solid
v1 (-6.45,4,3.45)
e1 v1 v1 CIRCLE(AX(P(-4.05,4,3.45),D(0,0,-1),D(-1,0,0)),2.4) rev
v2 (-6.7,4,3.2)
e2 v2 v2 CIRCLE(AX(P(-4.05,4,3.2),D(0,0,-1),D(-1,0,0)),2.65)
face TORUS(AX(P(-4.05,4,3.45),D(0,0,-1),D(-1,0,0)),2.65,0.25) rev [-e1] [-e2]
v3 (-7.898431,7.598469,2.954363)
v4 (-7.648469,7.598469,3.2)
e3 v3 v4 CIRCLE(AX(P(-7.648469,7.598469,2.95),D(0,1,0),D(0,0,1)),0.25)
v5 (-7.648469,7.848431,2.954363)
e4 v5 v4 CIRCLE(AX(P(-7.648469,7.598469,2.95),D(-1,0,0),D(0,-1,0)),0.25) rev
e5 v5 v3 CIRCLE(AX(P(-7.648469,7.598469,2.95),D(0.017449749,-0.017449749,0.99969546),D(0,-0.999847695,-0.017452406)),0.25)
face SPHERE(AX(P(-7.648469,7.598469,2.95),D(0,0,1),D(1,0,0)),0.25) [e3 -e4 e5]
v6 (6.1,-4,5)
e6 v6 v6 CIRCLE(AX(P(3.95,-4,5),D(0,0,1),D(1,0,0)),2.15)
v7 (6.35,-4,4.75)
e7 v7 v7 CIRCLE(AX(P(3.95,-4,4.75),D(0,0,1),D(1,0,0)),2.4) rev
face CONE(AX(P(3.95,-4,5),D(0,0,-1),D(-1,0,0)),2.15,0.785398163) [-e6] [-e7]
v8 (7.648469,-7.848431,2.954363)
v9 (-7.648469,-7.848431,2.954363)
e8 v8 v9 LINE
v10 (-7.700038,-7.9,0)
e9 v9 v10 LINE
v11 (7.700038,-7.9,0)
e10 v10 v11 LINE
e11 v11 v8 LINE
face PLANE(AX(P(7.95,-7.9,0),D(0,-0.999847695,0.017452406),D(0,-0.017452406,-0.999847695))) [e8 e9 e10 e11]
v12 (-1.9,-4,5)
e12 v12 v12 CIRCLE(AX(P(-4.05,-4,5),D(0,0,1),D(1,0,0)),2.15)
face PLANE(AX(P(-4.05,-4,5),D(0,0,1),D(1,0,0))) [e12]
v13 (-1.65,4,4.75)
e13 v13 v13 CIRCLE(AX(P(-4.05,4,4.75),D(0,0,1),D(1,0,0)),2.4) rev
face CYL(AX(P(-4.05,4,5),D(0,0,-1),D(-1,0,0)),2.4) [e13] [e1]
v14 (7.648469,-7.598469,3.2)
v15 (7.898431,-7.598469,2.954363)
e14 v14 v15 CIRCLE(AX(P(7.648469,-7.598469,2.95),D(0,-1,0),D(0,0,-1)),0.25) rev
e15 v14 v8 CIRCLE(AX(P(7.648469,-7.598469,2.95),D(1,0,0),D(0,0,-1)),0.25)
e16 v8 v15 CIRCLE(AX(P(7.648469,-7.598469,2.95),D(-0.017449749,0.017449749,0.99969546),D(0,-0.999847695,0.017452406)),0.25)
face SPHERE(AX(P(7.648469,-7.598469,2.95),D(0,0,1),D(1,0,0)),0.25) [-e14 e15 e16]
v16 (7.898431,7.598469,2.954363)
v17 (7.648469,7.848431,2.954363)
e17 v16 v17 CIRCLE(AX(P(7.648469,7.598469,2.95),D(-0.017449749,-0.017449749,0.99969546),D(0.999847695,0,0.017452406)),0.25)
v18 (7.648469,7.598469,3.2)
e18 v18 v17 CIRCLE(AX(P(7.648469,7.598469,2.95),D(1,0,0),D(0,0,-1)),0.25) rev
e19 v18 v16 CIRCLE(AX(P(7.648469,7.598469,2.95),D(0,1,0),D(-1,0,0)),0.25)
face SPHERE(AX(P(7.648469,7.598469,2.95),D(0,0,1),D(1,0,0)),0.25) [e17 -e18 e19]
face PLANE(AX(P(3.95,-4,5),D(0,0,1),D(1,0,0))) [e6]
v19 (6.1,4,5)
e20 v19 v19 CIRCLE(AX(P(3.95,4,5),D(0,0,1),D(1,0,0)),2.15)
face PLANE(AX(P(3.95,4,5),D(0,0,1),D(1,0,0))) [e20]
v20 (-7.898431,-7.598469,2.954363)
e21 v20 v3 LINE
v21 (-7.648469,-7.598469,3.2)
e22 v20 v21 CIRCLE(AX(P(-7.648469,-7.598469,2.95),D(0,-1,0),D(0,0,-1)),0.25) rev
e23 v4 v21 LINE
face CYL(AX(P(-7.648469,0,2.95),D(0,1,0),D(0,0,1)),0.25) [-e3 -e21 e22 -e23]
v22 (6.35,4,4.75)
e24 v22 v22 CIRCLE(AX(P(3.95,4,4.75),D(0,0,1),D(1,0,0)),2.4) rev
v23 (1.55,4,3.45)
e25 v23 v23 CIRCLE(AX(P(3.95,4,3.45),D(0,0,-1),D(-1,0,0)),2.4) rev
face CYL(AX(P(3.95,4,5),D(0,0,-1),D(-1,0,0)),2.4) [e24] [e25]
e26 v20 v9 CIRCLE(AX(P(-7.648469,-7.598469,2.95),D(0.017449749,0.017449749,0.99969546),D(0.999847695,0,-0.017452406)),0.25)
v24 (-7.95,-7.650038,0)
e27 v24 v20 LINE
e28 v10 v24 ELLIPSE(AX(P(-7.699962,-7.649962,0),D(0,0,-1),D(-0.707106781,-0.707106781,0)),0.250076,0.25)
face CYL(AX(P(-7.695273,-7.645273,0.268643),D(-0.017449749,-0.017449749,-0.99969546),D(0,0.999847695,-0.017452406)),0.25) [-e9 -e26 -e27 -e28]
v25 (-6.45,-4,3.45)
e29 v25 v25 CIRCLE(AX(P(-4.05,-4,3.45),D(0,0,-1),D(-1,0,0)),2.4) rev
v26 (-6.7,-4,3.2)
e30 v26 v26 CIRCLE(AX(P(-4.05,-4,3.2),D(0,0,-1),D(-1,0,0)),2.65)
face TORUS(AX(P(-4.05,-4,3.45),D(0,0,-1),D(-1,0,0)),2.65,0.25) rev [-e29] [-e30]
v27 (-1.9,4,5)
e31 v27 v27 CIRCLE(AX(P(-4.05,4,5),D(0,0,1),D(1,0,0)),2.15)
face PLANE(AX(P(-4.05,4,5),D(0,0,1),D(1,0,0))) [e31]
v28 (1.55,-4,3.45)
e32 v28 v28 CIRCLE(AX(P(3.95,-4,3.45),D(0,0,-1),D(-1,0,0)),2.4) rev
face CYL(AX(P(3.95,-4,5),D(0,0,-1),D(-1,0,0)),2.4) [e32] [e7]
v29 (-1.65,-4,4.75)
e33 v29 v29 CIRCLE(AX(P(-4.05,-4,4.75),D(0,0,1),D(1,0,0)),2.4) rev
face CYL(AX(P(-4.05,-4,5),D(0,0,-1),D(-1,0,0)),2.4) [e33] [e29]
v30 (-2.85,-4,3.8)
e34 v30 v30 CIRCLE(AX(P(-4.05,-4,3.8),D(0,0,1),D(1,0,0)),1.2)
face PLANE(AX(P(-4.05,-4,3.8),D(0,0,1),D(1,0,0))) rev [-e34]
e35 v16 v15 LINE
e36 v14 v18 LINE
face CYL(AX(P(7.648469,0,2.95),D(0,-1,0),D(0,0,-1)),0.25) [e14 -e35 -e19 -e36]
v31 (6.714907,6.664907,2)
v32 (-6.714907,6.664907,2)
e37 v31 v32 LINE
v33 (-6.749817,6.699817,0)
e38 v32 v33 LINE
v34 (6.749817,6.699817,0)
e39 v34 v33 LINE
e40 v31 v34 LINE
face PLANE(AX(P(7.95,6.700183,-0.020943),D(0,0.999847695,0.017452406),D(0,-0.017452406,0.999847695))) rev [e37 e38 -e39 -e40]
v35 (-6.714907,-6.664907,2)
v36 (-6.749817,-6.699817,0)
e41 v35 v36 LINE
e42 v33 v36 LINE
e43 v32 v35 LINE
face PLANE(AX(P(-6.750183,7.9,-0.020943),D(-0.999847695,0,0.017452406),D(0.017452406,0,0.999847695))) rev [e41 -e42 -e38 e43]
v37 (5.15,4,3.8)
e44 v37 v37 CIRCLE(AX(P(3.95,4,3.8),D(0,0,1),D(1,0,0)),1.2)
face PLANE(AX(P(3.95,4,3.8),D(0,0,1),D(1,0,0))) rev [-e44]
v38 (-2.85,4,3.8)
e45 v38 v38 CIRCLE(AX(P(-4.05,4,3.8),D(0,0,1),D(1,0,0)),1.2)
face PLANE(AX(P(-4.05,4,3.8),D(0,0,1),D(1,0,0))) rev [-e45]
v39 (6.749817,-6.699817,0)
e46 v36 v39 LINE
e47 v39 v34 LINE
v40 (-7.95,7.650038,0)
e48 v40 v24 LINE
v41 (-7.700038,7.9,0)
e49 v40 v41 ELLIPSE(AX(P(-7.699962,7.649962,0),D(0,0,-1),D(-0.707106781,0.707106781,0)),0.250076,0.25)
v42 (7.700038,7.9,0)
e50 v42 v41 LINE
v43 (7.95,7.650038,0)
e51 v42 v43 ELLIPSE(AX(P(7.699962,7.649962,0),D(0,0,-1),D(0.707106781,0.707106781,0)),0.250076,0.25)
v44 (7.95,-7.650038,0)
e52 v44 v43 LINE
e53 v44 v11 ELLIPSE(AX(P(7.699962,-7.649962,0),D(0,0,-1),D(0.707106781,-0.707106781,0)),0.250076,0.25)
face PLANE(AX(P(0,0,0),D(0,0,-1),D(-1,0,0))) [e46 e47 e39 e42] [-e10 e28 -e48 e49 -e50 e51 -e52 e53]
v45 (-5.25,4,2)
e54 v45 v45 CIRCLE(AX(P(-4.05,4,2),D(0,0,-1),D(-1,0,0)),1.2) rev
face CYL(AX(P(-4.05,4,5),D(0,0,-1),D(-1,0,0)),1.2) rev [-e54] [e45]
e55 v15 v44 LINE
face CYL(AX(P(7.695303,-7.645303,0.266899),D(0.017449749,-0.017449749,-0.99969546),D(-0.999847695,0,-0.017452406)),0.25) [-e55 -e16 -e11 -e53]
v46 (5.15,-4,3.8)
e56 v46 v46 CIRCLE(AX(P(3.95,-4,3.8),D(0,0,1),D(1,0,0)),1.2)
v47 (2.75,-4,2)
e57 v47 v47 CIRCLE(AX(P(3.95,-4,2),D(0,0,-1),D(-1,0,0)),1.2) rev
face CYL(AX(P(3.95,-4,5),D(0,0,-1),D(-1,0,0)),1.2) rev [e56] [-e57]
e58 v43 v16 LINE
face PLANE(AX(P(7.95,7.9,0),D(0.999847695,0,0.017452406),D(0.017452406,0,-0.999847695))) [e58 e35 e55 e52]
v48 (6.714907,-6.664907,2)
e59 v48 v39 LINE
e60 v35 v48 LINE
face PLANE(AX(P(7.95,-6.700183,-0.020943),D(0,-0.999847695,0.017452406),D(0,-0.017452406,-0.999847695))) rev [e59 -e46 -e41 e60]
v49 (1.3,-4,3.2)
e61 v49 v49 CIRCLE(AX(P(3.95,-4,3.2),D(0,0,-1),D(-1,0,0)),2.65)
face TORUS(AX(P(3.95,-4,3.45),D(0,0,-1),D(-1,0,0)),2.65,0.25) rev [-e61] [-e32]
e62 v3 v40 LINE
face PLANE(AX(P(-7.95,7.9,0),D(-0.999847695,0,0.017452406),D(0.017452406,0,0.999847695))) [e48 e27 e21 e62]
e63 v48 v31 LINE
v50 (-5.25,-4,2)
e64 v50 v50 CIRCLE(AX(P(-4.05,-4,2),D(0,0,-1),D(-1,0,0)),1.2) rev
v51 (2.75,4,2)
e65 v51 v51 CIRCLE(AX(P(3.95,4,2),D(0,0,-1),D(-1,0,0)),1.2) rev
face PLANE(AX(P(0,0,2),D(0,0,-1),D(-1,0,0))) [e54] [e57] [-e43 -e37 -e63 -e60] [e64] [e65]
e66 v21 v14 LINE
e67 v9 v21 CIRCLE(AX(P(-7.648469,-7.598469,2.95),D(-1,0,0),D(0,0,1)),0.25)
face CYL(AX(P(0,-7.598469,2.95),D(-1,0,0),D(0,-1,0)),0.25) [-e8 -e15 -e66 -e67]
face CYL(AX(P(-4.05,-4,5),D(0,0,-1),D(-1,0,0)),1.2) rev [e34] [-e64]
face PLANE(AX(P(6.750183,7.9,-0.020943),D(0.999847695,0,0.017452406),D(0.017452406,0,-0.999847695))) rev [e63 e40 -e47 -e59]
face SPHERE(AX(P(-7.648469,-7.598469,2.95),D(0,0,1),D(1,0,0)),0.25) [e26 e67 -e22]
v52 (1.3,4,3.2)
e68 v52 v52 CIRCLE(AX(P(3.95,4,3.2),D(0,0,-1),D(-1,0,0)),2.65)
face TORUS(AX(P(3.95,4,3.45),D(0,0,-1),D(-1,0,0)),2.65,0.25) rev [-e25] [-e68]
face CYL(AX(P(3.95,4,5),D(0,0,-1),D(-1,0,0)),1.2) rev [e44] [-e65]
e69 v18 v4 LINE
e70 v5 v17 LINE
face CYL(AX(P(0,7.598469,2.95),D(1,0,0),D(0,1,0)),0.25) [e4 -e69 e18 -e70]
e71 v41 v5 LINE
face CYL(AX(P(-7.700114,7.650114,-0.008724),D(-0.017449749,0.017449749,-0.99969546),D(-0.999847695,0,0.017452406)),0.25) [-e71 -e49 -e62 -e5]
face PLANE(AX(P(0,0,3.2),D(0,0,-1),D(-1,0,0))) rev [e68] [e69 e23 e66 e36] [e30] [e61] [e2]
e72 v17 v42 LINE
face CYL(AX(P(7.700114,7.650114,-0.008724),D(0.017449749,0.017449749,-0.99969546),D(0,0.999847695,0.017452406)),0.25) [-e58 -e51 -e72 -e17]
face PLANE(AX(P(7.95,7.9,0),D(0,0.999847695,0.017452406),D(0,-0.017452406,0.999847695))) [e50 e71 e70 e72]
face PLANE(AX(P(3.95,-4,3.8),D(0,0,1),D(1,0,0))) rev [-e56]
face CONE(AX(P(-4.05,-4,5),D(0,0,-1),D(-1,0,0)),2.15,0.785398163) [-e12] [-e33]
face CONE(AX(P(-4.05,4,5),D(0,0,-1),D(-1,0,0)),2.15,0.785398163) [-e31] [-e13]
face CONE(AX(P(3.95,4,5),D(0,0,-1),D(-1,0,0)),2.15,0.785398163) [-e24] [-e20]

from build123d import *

# Parameters (mm, degrees)
SKETCH1_W                  = 15.9
SKETCH1_H                  = 15.8
BOSS_EXTRUDE1_DEPTH        = 3.2
BOSS_EXTRUDE1_TAPER        = 1
SKETCH2_R                  = 2.4
BOSS_EXTRUDE2_DEPTH        = 1.8
CHAMFER3_SIZE              = 0.25
LPATTERN2_COUNT            = 2
LPATTERN2_PITCH            = 8
LPATTERN2_COUNT_DIR2       = 2
LPATTERN2_PITCH_DIR2       = 8
CHAMFER3_OF_LPATTERN2_SIZE = 0.25
SHELL1_OUTLINE_R           = 1.2
SHELL1_DEPTH               = 3.8
FILLET2_R                  = 0.25


with BuildPart() as part:
    # Sketch1 → Boss-Extrude1 (new body)
    with BuildSketch(Plane.XY):
        Rectangle(SKETCH1_W, SKETCH1_H)
    extrude(amount=BOSS_EXTRUDE1_DEPTH, taper=BOSS_EXTRUDE1_TAPER)

    # Sketch2 → Boss-Extrude2 (add)
    with BuildSketch(Plane.XY.offset(3.2)):
        with Locations(Location((-4.05, -4, 0), (0, 0, 180))):
            Circle(SKETCH2_R)
    boss_extrude2 = extrude(amount=BOSS_EXTRUDE2_DEPTH)

    # Chamfer3
    chamfer3_edges = [part.edges().sort_by_distance(p)[0] for p in [
        (-1.65, -4, 5),
    ]]
    chamfer(chamfer3_edges, length=CHAMFER3_SIZE)

    # LPattern2: Boss-Extrude2 2 × 2
    with Locations(*[(j * LPATTERN2_PITCH_DIR2, i * LPATTERN2_PITCH, 0) for i in range(LPATTERN2_COUNT) for j in range(LPATTERN2_COUNT_DIR2) if (i, j) != (0, 0)]):
        add(boss_extrude2)

    # Chamfer3 of LPattern2
    chamfer3_of_lpattern2_edges = [part.edges().sort_by_distance(p)[0] for p in [
        (6.35, -4, 5),
        (-1.65, 4, 5),
        (6.35, 4, 5),
    ]]
    chamfer(chamfer3_of_lpattern2_edges, length=CHAMFER3_OF_LPATTERN2_SIZE)

    # Shell1: read off the stored shape, not the designer's step
    # Shell1 outline → Shell1 (cut)
    with BuildSketch(Plane.XY):
        with Locations((3.95, 4)):
            Circle(SHELL1_OUTLINE_R)
        with Locations((3.95, -4)):
            Circle(SHELL1_OUTLINE_R)
        with Locations((-4.05, -4)):
            Circle(SHELL1_OUTLINE_R)
        with Locations((-4.05, 4)):
            Circle(SHELL1_OUTLINE_R)
    extrude(amount=SHELL1_DEPTH, mode=Mode.SUBTRACT)

    # Shell1 2: loft between two sections, ruled curve by curve
    shell1_2_from = [
        Edge.make_line((-6.714907076, 6.664907076, 2), (-6.714907076, -6.664907076, 2)),
        Edge.make_line((-6.714907076, -6.664907076, 2), (6.714907076, -6.664907076, 2)),
        Edge.make_line((6.714907076, -6.664907076, 2), (6.714907076, 6.664907076, 2)),
        Edge.make_line((6.714907076, 6.664907076, 2), (-6.714907076, 6.664907076, 2)),
    ]
    shell1_2_to = [
        Edge.make_line((-6.749817206, 6.699817206, 0), (-6.749817206, -6.699817206, 0)),
        Edge.make_line((-6.749817206, -6.699817206, 0), (6.749817206, -6.699817206, 0)),
        Edge.make_line((6.749817206, -6.699817206, 0), (6.749817206, 6.699817206, 0)),
        Edge.make_line((6.749817206, 6.699817206, 0), (-6.749817206, 6.699817206, 0)),
    ]
    shell1_2 = Solid(Shell([*[Face.make_surface_from_curves(shell1_2_from[k], shell1_2_to[k]) for k in range(4)], Face(Wire(shell1_2_from)), Face(Wire(shell1_2_to))]))
    add(shell1_2, mode=Mode.SUBTRACT)

    # Fillet2
    fillet2_edges = [part.edges().sort_by_distance(p)[0] for p in [
        (7.894143792, 0, 3.2),
        (0, 7.844143792, 3.2),
        (-1.65, -4, 3.2),
        (-1.65, 4, 3.2),
        (6.35, -4, 3.2),
        (6.35, 4, 3.2),
        (-7.894143792, 0, 3.2),
        (-7.922071434, 7.872071434, 1.600026465),
        (7.922071896, 7.872071896, 1.6),
        (7.922071434, -7.872071434, 1.600026465),
        (-7.922071896, -7.872071896, 1.6),
        (0, -7.844143792, 3.2),
    ]]
    fillet(fillet2_edges, radius=FILLET2_R)


solid = part.part
